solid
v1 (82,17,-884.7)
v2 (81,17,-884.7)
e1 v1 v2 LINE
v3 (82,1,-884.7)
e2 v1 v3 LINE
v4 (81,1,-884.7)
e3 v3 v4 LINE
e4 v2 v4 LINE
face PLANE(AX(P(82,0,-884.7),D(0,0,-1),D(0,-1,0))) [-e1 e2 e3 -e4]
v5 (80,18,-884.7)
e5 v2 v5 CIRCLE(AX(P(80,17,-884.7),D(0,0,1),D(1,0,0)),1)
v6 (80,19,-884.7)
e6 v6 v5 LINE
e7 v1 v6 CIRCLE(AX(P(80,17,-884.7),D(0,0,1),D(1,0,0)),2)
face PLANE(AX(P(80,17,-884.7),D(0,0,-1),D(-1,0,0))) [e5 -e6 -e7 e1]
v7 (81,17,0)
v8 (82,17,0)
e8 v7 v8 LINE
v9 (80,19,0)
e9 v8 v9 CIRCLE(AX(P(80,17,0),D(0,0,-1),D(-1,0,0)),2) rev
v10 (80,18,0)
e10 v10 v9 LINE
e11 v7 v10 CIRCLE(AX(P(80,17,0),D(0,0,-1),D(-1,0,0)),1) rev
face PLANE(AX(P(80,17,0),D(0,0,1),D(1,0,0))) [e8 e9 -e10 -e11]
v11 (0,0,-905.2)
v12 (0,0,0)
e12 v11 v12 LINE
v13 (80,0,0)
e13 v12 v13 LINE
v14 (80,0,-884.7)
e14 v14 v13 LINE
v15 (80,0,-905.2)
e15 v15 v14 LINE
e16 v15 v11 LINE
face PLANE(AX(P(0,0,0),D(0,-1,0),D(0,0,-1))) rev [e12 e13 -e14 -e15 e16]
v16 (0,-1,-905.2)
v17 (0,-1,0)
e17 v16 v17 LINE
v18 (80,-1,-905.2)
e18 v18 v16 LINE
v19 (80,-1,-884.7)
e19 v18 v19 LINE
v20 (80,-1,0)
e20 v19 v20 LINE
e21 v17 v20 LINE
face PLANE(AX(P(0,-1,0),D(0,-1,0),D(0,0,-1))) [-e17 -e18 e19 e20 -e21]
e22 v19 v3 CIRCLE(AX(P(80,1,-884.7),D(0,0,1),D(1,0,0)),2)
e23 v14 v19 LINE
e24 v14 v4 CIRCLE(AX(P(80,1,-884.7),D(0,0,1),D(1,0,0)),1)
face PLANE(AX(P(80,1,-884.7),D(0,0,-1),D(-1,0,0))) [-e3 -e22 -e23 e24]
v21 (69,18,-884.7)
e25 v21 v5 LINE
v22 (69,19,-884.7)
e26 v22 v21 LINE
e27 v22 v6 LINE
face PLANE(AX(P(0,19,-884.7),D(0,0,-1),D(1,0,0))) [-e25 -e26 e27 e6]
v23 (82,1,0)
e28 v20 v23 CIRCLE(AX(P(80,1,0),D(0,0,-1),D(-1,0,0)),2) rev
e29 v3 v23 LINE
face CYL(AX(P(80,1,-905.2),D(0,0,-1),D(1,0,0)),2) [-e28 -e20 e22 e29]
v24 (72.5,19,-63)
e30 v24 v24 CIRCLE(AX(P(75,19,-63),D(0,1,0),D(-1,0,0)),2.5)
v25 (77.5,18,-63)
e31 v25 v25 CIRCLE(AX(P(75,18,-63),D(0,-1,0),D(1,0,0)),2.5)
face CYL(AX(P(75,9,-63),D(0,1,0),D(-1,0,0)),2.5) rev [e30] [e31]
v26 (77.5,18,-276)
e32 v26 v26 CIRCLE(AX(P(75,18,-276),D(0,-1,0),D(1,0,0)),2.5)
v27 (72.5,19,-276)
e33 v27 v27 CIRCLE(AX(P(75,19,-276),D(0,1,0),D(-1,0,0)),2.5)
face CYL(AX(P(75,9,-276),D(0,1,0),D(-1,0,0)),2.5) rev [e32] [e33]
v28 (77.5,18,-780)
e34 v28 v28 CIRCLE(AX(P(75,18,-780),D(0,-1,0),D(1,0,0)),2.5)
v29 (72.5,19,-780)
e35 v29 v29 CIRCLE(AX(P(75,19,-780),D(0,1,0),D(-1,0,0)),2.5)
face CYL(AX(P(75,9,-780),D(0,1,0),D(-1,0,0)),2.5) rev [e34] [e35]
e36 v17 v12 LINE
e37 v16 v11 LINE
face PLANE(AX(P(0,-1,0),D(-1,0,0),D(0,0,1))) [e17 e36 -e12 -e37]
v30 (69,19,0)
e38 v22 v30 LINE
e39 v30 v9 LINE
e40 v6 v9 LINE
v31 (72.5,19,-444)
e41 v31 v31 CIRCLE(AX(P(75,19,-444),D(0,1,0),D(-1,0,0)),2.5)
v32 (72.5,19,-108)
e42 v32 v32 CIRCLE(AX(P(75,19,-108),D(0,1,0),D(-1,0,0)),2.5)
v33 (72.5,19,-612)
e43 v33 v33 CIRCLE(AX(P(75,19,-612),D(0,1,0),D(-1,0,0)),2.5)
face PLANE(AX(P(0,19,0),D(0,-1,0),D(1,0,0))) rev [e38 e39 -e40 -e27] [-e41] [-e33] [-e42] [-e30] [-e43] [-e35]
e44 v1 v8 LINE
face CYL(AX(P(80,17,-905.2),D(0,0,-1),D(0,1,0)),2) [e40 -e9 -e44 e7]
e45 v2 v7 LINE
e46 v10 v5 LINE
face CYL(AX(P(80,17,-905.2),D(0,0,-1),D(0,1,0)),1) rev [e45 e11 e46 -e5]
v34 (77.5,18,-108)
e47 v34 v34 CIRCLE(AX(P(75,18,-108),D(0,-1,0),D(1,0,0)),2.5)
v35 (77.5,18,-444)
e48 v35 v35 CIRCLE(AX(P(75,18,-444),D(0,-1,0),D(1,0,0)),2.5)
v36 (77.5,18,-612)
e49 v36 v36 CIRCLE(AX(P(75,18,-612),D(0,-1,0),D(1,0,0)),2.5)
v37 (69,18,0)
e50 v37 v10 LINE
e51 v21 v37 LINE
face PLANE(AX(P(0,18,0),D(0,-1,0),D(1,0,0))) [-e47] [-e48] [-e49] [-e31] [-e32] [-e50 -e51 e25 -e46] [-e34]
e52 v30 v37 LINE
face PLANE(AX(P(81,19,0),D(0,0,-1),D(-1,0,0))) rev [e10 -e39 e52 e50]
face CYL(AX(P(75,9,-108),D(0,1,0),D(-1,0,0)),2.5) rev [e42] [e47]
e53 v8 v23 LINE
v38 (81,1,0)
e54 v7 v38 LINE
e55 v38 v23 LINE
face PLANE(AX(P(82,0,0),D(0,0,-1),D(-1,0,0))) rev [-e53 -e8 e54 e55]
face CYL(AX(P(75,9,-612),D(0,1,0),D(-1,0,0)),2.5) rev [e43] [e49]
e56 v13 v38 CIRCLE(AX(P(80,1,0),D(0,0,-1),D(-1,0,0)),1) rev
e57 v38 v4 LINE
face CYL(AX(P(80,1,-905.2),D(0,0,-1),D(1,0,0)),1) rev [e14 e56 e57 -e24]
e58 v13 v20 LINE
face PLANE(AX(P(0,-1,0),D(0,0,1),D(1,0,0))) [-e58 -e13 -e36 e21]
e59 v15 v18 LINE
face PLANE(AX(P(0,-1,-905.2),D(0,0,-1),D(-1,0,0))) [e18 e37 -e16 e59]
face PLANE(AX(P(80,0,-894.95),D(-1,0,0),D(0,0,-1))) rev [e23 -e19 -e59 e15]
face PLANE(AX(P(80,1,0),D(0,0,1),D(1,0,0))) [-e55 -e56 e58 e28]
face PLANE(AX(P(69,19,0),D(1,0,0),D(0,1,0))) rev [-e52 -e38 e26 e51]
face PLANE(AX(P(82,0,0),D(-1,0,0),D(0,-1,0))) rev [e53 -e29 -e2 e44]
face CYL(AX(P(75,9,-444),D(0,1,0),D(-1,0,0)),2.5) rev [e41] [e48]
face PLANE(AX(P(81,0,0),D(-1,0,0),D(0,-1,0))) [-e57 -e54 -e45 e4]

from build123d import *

# Parameters (mm, degrees)
SKETCH1_W                    = 82
SKETCH1_H                    = 905.2
BASE_FLANGE1_DEPTH           = 1
EDGE_FLANGE1_STRIP_W         = 6
EDGE_FLANGE1_STRIP_H         = 1
EDGE_FLANGE1_STRIP_CUT_DEPTH = 905.2
EDGE_FLANGE1_DEPTH           = 905.2
EDGE_FLANGE2_STRIP_W         = 6
EDGE_FLANGE2_STRIP_H         = 1
EDGE_FLANGE2_STRIP_CUT_DEPTH = 905.2
EDGE_FLANGE2_DEPTH           = 905.2
SKETCH19_R                   = 2.5
CUT_EXTRUDE2_DEPTH           = 10
CUT_EXTRUDE3_START           = -905.2
CUT_EXTRUDE3_DEPTH           = 20.5


# Read off the part's stored shape, not the designer's step: Cut-Extrude3
# Sheet-metal steps are written as plain solids
with BuildPart() as part:
    # Sketch1 → Base-Flange1 (new body)
    with BuildSketch(Plane(origin=(0, 0, 0), x_dir=(1, 0, 0), z_dir=(0, 1, 0))):
        with Locations((41, 452.6)):
            Rectangle(SKETCH1_W, SKETCH1_H)
    extrude(amount=-BASE_FLANGE1_DEPTH)

    # Edge-Flange1 strip (across the edge) → Edge-Flange1 strip cut (cut)
    with BuildSketch(Plane(origin=(82, 0, 0), x_dir=(-1, 0, 0), z_dir=(0, 0, -1))):
        with Locations((-1, -0.5)):
            Rectangle(EDGE_FLANGE1_STRIP_W, EDGE_FLANGE1_STRIP_H)
    extrude(amount=EDGE_FLANGE1_STRIP_CUT_DEPTH, mode=Mode.SUBTRACT)

    # Edge-Flange1 section (across the edge) → Edge-Flange1 (add)
    with BuildSketch(Plane(origin=(82, 0, 0), x_dir=(-1, 0, 0), z_dir=(0, 0, -1))):
        with BuildLine():
            Line((0, 1), (0, 19))
            Line((0, 19), (1, 19))
            Line((1, 19), (1, 1))
            ThreePointArc((1, 1), (1.292893219, 0.292893219), (2, 0))
            Line((2, 0), (2, -1))
            ThreePointArc((2, -1), (0.585786438, -0.414213562), (0, 1))
        make_face()
    extrude(amount=EDGE_FLANGE1_DEPTH)

    # Edge-Flange2 strip (across the edge) → Edge-Flange2 strip cut (cut)
    with BuildSketch(Plane(origin=(81, 19, 0), x_dir=(0, -1, 0), z_dir=(0, 0, -1))):
        with Locations((-1, -0.5)):
            Rectangle(EDGE_FLANGE2_STRIP_W, EDGE_FLANGE2_STRIP_H)
    extrude(amount=EDGE_FLANGE2_STRIP_CUT_DEPTH, mode=Mode.SUBTRACT)

    # Edge-Flange2 section (across the edge) → Edge-Flange2 (add)
    with BuildSketch(Plane(origin=(81, 19, 0), x_dir=(0, -1, 0), z_dir=(0, 0, -1))):
        with BuildLine():
            Line((0, 1), (0, 12))
            Line((0, 12), (1, 12))
            Line((1, 12), (1, 1))
            ThreePointArc((1, 1), (1.292893219, 0.292893219), (2, 0))
            Line((2, 0), (2, -1))
            ThreePointArc((2, -1), (0.585786438, -0.414213562), (0, 1))
        make_face()
    extrude(amount=EDGE_FLANGE2_DEPTH)

    # Sketch19 → Cut-Extrude2 (cut)
    with BuildSketch(Plane(origin=(0, 19, 0), x_dir=(1, 0, 0), z_dir=(0, 1, 0))):
        with Locations(Location((75, 63, 0), (0, 0, 180))):
            Circle(SKETCH19_R)
        with Locations(Location((75, 108, 0), (0, 0, 180))):
            Circle(SKETCH19_R)
        with Locations(Location((75, 276, 0), (0, 0, 180))):
            Circle(SKETCH19_R)
        with Locations(Location((75, 444, 0), (0, 0, 180))):
            Circle(SKETCH19_R)
        with Locations(Location((75, 612, 0), (0, 0, 180))):
            Circle(SKETCH19_R)
        with Locations(Location((75, 780, 0), (0, 0, 180))):
            Circle(SKETCH19_R)
    extrude(amount=-CUT_EXTRUDE2_DEPTH, mode=Mode.SUBTRACT)

    # Cut-Extrude3 outline → Cut-Extrude3 (cut)
    with BuildSketch(Plane.XY.offset(CUT_EXTRUDE3_START)):
        with BuildLine():
            ThreePointArc((81, 1), (80.707106781, 0.292893219), (80, 0))
            Line((80, 0), (80, -1))
            ThreePointArc((80, -1), (81.414213562, -0.414213562), (82, 1))
            Line((82, 1), (82, 17))
            ThreePointArc((82, 17), (81.414213562, 18.414213562), (80, 19))
            Line((80, 19), (69, 19))
            Line((69, 19), (69, 18))
            Line((69, 18), (80, 18))
            ThreePointArc((80, 18), (80.707106781, 17.707106781), (81, 17))
            Line((81, 17), (81, 1))
        make_face()
    extrude(amount=CUT_EXTRUDE3_DEPTH, mode=Mode.SUBTRACT)


solid = part.part
